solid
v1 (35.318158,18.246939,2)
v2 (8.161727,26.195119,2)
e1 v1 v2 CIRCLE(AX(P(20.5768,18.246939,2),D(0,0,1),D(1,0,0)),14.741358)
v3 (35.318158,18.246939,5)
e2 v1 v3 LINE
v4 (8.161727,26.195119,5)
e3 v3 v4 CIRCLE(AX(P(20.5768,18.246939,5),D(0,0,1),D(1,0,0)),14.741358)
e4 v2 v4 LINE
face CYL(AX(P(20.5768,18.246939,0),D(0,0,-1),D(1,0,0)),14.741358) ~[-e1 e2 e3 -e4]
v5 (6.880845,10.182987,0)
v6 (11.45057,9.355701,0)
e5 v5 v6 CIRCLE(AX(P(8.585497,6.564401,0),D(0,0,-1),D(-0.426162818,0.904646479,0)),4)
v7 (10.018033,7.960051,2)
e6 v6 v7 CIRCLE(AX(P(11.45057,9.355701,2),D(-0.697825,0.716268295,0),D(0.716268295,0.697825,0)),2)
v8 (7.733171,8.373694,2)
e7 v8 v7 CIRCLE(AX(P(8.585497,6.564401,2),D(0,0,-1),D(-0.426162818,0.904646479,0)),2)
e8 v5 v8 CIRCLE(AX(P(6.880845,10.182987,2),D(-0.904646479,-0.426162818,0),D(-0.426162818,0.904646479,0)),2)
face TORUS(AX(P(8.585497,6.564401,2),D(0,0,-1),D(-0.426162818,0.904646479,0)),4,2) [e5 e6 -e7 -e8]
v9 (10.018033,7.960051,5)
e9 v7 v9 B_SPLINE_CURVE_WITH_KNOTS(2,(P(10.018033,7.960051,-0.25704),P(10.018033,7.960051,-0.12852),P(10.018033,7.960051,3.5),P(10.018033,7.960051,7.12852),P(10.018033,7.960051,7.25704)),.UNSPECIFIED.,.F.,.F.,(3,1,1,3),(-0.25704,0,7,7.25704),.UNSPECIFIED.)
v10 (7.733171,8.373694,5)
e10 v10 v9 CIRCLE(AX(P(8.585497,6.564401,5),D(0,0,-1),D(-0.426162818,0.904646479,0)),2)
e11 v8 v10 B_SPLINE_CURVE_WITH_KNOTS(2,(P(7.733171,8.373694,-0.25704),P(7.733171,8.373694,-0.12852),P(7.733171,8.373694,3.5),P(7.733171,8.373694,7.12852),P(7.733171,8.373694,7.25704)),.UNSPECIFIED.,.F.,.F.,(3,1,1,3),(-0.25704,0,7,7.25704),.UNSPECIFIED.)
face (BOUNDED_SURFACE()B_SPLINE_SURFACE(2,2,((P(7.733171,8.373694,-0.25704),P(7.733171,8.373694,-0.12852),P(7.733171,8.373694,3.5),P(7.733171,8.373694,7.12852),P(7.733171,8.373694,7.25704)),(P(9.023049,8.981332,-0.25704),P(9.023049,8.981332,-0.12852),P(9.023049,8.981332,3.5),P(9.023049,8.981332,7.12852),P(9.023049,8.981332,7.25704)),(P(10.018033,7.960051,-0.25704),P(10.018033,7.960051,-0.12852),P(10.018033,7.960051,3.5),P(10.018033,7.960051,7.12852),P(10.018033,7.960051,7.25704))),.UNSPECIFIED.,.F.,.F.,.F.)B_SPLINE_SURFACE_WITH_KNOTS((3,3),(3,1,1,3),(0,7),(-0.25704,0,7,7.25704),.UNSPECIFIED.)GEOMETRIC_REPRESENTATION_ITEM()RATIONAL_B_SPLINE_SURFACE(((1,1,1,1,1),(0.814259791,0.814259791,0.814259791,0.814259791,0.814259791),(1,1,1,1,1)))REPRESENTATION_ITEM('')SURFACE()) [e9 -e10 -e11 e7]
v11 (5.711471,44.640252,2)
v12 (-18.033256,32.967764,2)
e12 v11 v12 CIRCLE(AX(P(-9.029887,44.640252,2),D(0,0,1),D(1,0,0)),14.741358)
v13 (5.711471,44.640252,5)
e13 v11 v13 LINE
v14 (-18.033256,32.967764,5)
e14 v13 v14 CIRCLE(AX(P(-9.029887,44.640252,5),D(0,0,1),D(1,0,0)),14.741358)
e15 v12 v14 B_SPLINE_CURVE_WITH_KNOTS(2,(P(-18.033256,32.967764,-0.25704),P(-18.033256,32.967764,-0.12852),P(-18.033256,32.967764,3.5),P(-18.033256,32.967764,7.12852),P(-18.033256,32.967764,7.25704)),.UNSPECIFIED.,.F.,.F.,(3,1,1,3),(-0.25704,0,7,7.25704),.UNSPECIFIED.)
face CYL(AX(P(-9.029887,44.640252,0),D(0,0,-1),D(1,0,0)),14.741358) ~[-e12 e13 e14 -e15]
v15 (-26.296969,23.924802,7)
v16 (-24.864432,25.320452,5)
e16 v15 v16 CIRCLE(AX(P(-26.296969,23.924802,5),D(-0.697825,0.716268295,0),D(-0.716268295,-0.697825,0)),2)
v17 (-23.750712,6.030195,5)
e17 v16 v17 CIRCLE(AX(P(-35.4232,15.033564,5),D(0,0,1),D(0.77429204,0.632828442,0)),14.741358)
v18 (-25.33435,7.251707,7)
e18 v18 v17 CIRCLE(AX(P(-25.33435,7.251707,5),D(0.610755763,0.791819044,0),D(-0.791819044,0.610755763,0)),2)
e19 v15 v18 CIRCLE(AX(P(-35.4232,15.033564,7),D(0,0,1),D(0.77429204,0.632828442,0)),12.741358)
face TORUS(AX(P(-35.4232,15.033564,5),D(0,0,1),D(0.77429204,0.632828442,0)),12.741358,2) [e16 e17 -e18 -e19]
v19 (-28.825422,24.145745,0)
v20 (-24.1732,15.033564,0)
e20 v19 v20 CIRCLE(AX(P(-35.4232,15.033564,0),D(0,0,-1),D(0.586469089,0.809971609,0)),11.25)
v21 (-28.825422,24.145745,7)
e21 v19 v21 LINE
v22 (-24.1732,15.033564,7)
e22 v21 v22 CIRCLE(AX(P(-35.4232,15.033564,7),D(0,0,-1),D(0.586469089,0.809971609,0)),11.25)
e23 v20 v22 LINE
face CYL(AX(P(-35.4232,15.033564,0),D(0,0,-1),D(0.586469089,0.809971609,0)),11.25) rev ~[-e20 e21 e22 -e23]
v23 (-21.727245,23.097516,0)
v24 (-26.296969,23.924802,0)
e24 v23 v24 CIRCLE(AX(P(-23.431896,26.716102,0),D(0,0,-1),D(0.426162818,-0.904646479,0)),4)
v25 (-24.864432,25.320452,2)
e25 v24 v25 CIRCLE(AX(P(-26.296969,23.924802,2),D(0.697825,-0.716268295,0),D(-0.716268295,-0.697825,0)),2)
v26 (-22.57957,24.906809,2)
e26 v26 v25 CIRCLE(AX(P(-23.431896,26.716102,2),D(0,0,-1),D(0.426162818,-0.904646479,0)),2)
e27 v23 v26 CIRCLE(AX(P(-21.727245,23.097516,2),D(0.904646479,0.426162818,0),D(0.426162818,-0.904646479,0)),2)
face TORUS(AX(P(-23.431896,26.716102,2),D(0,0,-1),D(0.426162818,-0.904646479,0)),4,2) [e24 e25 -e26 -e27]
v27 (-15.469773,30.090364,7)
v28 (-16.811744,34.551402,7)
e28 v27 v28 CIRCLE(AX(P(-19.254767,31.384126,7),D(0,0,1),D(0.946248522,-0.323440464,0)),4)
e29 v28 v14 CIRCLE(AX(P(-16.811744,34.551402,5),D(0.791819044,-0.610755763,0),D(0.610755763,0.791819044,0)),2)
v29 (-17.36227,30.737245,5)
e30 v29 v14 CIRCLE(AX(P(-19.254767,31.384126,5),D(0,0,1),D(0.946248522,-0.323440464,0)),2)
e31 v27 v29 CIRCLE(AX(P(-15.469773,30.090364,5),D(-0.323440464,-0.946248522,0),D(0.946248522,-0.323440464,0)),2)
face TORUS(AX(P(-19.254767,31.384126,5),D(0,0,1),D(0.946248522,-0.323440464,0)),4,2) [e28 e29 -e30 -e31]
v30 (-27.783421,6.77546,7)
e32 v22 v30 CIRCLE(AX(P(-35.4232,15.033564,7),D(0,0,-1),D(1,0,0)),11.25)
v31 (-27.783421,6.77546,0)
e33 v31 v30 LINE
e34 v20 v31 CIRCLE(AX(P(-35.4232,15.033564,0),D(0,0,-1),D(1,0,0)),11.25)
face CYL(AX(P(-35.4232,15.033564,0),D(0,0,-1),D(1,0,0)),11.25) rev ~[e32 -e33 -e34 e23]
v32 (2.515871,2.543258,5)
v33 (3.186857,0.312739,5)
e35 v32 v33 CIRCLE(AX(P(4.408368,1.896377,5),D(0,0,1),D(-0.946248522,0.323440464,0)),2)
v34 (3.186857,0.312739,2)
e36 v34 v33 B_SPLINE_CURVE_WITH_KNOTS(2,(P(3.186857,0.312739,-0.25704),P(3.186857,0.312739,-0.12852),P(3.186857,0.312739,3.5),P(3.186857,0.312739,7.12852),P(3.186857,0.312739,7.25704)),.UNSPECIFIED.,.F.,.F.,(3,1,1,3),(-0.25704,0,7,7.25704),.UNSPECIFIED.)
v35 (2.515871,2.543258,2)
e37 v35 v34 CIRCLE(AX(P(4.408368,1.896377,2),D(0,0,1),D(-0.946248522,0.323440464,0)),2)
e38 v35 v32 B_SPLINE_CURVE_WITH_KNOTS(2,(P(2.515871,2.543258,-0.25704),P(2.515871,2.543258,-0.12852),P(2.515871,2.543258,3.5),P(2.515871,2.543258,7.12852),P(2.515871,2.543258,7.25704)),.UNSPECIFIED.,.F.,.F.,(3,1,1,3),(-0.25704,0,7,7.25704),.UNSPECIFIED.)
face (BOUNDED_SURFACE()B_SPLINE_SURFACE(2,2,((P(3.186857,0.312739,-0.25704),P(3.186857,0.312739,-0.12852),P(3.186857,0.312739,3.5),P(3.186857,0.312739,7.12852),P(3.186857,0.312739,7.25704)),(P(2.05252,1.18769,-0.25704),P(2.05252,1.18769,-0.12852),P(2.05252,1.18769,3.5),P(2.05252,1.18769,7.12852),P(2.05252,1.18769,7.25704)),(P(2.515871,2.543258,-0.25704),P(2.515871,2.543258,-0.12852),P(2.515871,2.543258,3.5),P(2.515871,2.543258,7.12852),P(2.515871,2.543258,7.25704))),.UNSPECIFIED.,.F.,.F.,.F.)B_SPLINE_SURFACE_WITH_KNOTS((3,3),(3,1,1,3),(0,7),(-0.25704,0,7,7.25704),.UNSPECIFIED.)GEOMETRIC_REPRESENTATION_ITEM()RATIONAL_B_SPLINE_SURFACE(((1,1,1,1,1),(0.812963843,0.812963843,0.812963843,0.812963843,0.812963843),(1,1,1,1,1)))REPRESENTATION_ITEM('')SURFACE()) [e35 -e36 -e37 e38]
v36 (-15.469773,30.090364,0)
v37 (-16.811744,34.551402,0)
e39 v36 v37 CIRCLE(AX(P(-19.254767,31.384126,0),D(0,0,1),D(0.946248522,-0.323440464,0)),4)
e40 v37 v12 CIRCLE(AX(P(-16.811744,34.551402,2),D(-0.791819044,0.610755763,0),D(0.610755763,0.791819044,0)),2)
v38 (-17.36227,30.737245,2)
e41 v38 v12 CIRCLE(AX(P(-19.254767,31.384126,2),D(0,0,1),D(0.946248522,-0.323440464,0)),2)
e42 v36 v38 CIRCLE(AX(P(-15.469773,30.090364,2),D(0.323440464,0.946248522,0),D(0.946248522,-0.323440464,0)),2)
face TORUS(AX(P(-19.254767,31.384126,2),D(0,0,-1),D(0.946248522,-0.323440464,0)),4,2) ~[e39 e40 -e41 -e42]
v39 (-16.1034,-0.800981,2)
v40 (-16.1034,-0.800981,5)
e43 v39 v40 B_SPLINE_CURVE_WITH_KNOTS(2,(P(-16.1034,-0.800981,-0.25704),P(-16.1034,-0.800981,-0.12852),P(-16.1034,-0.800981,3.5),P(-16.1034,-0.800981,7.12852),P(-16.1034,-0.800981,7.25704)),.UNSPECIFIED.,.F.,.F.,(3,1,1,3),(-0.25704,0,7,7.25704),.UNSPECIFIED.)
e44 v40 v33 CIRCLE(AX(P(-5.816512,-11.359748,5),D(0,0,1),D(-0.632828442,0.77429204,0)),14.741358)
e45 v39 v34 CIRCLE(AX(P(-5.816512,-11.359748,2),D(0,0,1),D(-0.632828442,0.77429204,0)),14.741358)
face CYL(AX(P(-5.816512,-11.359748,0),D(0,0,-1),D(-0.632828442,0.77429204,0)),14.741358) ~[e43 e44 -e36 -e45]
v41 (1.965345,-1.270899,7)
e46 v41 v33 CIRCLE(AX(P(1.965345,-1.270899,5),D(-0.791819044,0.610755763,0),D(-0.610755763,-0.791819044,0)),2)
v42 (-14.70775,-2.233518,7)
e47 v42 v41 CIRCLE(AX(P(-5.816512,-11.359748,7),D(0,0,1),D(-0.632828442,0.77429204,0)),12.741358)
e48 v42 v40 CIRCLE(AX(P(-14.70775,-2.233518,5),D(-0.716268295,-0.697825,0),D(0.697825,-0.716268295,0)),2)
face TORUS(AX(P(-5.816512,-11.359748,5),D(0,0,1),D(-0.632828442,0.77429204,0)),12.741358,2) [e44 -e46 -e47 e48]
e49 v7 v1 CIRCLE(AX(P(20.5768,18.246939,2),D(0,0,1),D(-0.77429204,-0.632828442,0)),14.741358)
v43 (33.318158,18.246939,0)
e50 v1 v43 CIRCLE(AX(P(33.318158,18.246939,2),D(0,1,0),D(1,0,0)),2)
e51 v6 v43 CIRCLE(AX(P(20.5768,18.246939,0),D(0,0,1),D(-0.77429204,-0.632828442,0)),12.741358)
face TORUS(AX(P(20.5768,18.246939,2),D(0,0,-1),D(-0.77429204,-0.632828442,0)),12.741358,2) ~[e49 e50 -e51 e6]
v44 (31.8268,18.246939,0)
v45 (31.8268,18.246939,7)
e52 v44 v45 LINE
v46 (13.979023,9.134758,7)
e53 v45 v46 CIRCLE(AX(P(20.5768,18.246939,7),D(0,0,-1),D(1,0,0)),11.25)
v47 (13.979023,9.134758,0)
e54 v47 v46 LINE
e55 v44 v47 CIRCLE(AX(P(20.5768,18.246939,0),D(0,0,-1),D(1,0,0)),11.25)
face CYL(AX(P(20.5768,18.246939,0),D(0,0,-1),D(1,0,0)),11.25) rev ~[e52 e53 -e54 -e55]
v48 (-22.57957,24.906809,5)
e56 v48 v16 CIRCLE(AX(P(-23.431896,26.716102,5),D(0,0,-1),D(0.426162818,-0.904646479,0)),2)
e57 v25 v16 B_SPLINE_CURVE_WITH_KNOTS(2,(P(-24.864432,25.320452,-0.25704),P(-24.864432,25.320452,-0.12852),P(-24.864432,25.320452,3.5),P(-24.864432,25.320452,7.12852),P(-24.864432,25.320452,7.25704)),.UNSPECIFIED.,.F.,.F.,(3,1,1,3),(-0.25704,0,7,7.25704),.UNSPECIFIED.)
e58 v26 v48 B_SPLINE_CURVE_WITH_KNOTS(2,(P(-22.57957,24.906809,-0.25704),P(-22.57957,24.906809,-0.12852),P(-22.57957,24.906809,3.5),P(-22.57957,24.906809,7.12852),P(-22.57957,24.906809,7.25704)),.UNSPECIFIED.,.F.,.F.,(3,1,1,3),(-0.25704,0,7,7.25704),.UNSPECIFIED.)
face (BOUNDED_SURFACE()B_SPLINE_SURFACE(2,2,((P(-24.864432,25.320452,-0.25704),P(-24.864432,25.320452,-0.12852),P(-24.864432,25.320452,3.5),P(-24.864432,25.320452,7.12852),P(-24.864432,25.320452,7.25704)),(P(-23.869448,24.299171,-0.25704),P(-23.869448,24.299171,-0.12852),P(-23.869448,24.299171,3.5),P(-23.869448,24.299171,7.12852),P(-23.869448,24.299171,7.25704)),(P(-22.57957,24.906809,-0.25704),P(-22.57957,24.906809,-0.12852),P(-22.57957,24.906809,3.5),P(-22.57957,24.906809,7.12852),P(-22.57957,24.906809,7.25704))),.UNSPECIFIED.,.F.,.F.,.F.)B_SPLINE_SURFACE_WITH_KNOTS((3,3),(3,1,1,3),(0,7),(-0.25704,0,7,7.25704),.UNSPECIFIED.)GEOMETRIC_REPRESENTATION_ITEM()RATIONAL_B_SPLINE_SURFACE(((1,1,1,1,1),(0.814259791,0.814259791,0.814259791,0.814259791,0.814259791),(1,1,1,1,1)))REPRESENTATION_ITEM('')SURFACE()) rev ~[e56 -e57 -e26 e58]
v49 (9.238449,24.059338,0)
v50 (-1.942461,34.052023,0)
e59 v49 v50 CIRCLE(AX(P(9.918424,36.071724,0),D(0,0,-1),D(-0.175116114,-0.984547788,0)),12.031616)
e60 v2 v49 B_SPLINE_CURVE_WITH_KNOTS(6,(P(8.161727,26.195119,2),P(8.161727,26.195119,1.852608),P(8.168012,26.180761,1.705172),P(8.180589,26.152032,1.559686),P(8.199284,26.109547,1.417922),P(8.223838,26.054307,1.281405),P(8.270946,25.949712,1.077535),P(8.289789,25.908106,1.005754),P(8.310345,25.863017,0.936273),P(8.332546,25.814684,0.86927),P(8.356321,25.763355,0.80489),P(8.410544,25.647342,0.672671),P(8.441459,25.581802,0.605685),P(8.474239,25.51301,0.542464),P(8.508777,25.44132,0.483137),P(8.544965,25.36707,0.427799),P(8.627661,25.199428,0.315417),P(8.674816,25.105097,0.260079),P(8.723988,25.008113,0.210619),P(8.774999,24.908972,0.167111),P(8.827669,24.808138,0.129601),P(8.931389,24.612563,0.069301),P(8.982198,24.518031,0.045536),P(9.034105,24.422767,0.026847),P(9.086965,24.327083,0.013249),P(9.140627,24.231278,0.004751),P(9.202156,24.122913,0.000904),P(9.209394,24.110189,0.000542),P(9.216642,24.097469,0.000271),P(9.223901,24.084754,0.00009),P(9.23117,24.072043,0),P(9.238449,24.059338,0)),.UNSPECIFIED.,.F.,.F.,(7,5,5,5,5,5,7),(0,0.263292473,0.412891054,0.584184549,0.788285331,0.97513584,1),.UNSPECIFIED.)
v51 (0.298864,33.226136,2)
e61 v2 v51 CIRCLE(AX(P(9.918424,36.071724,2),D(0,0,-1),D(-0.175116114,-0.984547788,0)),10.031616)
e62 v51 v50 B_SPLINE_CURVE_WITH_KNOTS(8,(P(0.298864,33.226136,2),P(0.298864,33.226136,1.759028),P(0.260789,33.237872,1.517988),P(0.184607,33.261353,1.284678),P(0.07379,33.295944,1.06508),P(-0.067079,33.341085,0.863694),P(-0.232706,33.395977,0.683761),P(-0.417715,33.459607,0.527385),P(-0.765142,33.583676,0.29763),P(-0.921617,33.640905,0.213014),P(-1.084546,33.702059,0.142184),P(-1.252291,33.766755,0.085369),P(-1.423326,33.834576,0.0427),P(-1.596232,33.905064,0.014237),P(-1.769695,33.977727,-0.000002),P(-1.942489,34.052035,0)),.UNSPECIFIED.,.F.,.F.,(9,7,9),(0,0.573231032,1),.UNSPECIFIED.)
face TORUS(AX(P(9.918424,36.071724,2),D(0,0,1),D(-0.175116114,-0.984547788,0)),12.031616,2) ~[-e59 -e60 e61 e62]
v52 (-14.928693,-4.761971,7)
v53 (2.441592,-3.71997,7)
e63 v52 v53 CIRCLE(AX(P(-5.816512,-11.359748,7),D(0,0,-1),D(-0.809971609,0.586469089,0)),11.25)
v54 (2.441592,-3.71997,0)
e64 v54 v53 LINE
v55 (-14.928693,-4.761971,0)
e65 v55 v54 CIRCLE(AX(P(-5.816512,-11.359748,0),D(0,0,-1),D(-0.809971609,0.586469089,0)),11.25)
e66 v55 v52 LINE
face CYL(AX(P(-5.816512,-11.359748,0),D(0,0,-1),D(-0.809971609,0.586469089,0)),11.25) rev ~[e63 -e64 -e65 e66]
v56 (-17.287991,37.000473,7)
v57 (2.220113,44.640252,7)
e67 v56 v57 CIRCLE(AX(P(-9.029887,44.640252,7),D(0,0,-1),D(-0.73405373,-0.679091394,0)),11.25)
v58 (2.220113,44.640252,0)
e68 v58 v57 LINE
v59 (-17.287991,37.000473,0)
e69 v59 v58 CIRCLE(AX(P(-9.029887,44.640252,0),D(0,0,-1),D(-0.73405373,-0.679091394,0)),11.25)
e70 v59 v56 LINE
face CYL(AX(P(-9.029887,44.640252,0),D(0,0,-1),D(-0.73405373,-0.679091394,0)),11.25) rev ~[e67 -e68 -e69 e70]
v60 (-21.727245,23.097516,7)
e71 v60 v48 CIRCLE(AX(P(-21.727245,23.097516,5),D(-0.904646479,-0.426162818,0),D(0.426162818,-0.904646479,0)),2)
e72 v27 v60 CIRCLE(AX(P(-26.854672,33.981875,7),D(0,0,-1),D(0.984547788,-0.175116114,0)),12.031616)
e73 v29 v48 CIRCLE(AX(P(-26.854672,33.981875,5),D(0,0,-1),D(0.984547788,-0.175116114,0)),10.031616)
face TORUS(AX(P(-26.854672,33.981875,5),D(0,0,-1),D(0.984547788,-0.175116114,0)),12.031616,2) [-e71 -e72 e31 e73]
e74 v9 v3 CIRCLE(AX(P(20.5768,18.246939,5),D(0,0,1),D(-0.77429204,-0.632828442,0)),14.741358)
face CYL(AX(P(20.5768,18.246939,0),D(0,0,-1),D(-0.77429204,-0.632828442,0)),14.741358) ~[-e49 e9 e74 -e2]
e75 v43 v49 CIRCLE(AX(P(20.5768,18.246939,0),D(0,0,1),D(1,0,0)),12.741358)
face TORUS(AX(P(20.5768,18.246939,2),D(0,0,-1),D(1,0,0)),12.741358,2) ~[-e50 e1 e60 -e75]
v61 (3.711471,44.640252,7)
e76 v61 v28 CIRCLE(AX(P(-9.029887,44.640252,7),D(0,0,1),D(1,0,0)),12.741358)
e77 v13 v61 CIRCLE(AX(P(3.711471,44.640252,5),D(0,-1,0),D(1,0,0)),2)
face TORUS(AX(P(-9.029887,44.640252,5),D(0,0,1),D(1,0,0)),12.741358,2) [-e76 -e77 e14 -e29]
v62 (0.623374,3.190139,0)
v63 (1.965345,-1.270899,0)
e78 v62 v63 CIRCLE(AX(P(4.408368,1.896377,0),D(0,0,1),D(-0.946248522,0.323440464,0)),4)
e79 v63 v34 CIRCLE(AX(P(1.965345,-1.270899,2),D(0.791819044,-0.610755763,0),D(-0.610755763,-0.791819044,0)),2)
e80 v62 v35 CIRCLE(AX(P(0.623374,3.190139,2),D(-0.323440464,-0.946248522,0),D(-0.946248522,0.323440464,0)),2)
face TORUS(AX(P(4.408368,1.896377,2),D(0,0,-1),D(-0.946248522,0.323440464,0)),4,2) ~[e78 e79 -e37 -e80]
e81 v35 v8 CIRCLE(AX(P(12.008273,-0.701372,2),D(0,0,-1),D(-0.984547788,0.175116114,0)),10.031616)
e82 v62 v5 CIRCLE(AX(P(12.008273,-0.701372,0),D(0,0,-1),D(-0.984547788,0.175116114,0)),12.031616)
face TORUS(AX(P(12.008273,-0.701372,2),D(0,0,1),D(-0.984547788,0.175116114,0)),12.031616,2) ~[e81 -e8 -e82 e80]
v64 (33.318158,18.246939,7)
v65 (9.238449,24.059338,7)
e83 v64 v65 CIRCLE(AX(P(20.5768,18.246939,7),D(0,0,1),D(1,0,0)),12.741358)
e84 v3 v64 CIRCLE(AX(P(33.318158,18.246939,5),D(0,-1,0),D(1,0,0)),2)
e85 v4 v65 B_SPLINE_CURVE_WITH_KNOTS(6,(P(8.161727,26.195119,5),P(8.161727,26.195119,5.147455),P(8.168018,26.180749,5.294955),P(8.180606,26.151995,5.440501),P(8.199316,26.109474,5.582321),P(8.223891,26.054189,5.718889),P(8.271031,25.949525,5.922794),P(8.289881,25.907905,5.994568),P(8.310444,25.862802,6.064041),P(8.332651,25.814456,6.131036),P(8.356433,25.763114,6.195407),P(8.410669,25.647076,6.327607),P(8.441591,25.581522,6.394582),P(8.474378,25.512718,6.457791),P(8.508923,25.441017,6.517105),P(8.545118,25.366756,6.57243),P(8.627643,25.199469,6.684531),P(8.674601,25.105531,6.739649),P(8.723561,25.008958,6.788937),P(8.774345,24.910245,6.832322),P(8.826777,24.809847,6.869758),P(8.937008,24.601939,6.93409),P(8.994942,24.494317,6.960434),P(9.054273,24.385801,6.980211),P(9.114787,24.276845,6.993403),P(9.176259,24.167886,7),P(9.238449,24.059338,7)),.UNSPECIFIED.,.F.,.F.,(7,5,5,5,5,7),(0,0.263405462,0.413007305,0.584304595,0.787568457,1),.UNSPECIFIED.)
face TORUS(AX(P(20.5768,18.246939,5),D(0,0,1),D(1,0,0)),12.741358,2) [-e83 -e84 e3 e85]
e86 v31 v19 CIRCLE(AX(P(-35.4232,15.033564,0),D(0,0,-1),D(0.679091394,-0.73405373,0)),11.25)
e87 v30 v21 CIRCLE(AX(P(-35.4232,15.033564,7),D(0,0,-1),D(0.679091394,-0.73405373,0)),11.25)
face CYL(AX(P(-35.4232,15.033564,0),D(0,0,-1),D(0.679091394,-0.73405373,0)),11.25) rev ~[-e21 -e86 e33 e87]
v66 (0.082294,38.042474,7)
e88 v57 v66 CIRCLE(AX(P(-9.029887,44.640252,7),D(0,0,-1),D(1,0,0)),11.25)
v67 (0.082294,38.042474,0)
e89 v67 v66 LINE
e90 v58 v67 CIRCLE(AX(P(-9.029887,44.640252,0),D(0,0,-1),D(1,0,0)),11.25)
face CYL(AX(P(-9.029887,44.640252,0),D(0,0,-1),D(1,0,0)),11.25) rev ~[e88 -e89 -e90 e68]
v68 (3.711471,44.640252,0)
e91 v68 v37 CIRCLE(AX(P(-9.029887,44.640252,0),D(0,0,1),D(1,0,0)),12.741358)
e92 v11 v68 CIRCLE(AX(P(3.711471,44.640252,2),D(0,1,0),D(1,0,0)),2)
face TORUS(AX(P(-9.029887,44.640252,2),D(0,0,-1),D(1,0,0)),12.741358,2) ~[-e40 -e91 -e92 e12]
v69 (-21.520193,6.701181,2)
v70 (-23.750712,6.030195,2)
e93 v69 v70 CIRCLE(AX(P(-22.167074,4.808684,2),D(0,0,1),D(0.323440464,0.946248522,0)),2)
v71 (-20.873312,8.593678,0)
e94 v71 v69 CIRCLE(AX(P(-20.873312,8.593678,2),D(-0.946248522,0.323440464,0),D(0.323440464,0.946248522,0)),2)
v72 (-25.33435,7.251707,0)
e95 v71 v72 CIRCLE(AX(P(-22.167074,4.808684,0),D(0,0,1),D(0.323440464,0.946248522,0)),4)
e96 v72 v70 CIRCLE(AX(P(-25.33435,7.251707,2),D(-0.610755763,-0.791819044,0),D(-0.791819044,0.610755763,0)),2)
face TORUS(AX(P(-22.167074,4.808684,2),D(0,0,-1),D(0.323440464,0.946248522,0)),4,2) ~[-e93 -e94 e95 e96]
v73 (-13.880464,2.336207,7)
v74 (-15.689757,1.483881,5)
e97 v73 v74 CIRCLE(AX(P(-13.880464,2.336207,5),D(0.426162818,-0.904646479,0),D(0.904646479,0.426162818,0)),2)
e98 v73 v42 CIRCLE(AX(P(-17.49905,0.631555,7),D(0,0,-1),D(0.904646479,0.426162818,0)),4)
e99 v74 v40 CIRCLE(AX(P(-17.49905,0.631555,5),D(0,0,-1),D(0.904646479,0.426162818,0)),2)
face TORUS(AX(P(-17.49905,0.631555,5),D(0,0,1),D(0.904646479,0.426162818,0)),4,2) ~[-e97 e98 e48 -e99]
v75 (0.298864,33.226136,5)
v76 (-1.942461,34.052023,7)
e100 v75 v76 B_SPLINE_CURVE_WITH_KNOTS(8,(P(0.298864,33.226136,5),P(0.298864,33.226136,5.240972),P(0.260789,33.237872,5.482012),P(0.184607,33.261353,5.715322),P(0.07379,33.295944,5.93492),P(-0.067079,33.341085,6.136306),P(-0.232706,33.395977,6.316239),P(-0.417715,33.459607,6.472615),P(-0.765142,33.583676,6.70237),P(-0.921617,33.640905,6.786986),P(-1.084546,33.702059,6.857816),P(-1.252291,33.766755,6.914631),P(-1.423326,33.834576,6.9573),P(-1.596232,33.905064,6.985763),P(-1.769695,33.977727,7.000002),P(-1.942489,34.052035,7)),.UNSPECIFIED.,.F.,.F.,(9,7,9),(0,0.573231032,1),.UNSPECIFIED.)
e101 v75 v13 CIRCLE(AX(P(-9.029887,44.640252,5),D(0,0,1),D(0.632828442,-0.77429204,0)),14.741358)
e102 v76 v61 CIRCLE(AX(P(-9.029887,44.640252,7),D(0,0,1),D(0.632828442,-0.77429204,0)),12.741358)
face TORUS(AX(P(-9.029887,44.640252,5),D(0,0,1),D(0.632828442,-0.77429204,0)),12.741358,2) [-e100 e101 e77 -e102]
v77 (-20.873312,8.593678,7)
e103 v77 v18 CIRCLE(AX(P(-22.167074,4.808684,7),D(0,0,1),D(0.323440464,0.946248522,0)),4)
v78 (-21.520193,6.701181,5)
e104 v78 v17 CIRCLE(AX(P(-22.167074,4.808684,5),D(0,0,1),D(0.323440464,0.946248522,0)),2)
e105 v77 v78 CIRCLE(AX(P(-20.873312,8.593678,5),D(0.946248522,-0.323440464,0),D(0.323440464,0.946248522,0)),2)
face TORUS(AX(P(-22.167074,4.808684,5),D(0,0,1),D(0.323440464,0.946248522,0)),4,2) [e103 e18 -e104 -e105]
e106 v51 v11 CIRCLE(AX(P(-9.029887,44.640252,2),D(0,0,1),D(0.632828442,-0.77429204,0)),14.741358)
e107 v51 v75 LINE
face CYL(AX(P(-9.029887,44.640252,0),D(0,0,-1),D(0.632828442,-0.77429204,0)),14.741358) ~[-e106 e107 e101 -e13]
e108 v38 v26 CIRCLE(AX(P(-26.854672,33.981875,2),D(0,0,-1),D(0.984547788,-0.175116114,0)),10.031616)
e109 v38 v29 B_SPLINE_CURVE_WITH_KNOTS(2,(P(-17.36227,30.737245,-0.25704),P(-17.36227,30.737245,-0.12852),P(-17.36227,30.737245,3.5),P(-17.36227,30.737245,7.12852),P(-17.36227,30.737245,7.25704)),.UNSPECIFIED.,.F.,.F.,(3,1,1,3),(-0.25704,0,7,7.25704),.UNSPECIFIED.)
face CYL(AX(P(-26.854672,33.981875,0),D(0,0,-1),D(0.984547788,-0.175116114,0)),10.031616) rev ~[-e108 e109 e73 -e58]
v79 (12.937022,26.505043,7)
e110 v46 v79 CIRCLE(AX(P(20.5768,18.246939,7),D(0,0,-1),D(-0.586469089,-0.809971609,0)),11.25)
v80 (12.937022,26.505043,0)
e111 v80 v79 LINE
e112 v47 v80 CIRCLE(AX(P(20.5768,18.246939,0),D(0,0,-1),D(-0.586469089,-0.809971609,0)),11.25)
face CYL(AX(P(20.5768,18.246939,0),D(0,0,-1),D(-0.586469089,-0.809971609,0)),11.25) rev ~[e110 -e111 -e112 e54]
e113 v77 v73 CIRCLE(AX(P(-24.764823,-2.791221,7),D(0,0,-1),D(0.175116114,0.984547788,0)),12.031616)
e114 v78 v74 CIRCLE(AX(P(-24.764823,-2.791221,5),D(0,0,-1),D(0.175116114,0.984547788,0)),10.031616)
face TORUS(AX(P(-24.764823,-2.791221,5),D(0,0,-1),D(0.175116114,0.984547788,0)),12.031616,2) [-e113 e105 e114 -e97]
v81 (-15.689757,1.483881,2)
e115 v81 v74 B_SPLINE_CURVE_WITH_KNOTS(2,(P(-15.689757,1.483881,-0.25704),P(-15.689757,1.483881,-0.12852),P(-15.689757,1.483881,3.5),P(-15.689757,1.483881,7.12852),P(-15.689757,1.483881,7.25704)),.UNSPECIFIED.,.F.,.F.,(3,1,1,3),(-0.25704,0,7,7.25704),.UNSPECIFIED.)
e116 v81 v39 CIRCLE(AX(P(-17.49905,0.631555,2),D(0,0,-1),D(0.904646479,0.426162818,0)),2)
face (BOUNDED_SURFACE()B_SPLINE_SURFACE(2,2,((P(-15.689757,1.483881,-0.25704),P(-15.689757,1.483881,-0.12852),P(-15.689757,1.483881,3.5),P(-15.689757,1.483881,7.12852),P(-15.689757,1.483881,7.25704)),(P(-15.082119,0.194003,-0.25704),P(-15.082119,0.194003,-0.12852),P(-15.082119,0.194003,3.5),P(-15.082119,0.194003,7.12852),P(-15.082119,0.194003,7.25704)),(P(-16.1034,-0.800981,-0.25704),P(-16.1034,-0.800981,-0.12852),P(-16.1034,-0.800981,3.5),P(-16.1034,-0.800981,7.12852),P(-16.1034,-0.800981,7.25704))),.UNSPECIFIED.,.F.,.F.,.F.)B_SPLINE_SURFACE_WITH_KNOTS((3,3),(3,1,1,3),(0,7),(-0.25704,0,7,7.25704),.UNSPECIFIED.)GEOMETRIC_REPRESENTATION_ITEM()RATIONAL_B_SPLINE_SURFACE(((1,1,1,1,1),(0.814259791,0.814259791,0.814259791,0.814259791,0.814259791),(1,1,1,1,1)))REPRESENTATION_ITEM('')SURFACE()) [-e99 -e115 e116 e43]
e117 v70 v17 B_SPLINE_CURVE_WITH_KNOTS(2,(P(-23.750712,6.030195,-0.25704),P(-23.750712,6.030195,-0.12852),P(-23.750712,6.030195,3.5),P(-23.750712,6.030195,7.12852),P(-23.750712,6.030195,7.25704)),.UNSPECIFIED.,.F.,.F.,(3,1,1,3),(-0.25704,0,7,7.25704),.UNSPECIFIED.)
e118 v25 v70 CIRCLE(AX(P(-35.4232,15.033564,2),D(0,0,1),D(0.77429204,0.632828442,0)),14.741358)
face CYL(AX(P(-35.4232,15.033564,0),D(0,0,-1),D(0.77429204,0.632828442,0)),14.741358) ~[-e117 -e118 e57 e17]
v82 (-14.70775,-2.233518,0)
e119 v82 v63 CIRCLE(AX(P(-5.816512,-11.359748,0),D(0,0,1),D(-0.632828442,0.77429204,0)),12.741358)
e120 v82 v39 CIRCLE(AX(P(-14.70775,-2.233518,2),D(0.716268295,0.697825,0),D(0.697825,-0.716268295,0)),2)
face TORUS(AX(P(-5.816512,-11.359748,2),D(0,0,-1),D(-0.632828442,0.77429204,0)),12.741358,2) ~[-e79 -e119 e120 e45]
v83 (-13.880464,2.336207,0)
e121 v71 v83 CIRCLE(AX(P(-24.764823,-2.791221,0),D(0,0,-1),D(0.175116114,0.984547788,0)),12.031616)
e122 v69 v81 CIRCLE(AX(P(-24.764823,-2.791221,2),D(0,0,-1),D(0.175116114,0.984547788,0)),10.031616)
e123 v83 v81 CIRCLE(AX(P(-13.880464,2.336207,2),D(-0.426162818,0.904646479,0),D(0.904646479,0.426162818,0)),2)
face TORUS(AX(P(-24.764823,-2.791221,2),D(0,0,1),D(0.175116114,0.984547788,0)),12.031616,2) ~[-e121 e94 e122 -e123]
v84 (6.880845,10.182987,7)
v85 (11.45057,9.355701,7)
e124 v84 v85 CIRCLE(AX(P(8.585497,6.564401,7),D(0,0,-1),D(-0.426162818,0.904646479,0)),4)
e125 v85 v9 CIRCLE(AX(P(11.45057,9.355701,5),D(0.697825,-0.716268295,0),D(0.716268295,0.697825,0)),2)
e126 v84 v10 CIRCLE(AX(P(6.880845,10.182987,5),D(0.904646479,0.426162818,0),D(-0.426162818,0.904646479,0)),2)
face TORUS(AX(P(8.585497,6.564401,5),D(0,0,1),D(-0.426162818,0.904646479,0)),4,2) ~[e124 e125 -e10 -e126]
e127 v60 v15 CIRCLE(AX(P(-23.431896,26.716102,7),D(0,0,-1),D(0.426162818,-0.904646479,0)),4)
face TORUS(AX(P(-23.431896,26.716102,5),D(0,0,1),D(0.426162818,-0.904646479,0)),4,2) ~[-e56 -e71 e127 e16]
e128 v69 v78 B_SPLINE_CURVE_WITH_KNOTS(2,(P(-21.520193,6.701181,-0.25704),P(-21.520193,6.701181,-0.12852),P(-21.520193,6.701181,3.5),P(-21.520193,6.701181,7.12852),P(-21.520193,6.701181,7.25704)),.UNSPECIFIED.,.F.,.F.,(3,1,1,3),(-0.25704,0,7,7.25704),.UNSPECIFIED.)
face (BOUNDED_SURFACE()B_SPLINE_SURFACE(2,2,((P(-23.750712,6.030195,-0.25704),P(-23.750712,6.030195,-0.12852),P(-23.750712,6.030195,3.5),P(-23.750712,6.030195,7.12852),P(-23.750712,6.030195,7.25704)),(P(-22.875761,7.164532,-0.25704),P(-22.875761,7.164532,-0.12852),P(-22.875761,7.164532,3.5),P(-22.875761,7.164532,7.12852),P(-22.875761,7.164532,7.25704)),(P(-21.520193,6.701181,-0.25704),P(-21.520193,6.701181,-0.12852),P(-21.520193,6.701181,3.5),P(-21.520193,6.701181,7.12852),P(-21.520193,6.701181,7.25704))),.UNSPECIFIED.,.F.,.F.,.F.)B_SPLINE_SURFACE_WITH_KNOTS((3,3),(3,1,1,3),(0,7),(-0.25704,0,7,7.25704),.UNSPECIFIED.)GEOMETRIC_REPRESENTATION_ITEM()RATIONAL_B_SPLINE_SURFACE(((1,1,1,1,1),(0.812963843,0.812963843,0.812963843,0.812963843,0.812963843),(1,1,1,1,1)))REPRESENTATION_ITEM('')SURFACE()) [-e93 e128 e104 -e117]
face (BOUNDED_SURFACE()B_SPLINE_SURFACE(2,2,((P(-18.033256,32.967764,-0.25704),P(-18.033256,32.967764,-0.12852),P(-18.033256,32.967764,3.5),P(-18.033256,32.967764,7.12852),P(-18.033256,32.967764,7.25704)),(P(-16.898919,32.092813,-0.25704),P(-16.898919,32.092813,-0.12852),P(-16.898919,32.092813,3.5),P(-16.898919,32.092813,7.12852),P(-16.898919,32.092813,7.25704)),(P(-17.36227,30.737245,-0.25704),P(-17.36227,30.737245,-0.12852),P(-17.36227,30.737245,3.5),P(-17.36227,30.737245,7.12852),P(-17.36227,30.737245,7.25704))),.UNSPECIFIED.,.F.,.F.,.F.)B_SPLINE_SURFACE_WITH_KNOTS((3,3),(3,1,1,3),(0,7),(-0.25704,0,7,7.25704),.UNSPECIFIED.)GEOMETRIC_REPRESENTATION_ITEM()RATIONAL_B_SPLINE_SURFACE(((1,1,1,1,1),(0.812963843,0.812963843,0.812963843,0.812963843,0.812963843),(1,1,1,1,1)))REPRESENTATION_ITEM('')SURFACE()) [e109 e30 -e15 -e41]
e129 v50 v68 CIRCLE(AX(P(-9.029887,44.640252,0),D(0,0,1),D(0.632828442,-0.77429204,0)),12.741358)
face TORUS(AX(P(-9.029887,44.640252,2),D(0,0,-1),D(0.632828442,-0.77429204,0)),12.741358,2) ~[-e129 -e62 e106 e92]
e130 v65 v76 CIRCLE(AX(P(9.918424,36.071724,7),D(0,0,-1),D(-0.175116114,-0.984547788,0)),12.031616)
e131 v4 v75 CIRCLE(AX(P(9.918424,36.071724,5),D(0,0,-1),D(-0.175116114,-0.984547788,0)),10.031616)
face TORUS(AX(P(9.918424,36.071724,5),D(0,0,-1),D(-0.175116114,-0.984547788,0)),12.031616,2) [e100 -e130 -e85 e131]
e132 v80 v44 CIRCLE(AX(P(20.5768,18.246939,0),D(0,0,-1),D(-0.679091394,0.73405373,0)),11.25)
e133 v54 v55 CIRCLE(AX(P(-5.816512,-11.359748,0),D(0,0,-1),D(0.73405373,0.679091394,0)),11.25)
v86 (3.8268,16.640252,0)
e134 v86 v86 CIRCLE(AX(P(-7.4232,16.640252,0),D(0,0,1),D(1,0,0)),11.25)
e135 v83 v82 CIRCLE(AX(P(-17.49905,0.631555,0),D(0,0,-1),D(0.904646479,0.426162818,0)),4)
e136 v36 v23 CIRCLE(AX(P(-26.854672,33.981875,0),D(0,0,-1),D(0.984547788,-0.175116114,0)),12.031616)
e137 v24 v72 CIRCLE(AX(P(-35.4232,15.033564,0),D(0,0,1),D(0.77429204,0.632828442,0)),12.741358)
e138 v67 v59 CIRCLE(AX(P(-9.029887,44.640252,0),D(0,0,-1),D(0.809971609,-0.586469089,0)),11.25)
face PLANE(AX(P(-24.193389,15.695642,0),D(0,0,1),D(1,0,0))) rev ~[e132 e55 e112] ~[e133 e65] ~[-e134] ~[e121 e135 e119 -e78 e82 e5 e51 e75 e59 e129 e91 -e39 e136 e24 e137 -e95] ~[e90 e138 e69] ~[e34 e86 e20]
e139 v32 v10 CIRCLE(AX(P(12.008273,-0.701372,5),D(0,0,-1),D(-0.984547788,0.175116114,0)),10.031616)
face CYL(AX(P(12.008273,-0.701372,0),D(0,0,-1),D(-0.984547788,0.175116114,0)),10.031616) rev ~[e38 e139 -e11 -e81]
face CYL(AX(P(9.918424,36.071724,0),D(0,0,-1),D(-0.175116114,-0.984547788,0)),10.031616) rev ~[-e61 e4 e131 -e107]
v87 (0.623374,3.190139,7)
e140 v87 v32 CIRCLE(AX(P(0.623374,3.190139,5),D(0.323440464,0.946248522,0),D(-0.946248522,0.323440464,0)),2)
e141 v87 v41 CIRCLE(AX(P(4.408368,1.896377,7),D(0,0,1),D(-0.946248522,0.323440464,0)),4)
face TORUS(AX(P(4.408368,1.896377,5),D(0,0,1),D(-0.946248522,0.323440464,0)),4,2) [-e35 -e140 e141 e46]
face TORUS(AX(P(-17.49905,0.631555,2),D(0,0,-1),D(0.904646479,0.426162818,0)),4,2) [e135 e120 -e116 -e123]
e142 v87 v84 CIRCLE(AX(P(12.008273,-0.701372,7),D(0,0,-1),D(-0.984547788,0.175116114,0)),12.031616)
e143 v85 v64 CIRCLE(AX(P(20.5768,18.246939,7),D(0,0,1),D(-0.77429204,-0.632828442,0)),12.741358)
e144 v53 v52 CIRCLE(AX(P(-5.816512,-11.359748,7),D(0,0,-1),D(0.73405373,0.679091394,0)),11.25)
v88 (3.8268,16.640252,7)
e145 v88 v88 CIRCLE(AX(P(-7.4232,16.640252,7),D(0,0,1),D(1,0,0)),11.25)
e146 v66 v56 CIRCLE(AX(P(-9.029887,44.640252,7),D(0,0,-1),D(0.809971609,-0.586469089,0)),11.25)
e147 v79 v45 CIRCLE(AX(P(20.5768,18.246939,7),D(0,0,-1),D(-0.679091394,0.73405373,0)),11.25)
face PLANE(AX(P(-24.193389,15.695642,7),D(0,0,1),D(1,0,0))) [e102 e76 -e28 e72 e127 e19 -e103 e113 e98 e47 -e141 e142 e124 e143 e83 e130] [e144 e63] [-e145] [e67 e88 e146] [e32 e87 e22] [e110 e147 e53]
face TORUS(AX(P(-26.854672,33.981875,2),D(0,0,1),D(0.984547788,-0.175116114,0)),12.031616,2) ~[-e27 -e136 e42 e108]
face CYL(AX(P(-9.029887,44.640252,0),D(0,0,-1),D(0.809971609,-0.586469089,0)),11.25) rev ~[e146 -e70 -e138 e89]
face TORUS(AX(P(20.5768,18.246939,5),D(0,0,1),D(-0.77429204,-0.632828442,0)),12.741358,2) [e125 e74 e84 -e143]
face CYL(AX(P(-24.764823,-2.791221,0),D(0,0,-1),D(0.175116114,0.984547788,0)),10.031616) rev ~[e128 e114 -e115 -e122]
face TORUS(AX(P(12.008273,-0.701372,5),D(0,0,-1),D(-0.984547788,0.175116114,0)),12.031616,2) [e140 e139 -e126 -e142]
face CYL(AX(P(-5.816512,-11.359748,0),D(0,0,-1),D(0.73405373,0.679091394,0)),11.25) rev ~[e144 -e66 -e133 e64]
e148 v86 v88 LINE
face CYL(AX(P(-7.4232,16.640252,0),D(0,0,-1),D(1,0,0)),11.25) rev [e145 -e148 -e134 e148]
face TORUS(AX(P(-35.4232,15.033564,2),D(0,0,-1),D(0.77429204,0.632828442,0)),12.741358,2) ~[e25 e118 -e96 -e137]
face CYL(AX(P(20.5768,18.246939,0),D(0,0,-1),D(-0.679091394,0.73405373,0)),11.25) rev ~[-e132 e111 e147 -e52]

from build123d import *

# Parameters (mm, degrees)
F0_R     = 11.25
F1_DEPTH = 7
F2_R     = 2


with BuildPart() as f1:
    # F0 (on Top) → F1 (new body)
    with BuildSketch(Plane.XY):
        with BuildLine():
            ThreePointArc((-20.6818419333, 15.0335644628), (-21.5385463681, 19.9857387785), (-24.0090837029, 24.3623148626))
            ThreePointArc((-24.0090837029, 24.3623148626), (-26.4040491127, 23.960385675), (-28.8254223349, 24.1457450693))
            ThreePointArc((-28.8254223349, 24.1457450693), (-25.4035315724, 20.1491048046), (-24.1731995815, 15.0335644628))
            ThreePointArc((-24.1731995815, 15.0335644628), (-25.1151928743, 10.5271803553), (-27.7834213991, 6.7754599996))
            ThreePointArc((-27.7834213991, 6.7754599996), (-25.4145244015, 7.2193338549), (-23.0081257396, 7.0853843686))
            ThreePointArc((-23.0081257396, 7.0853843686), (-21.2753610709, 10.8927564753), (-20.6818419333, 15.0335644628))
        make_face()
        with BuildLine():
            ThreePointArc((-28.8254223349, 24.1457450693), (-26.4040491127, 23.960385675), (-24.0090837029, 24.3623148626))
            ThreePointArc((-24.0090837029, 24.3623148626), (-50.1398789796, 14.1809374616), (-23.0081257396, 7.0853843686))
            ThreePointArc((-23.0081257396, 7.0853843686), (-25.4145244015, 7.2193338549), (-27.7834213991, 6.7754599996))
            ThreePointArc((-27.7834213991, 6.7754599996), (-46.6530124471, 14.3599154428), (-28.8254223349, 24.1457450693))
        make_face()
        with BuildLine():
            ThreePointArc((0.2988637144, 33.2261356881), (-8.1772596841, 29.9235721685), (-16.9780667795, 32.2251777247))
            ThreePointArc((-16.9780667795, 32.2251777247), (-19.3767240664, 27.2950515881), (-24.0090837029, 24.3623148626))
            ThreePointArc((-24.0090837029, 24.3623148626), (-21.5385463681, 19.9857387785), (-20.6818419333, 15.0335644628))
            ThreePointArc((-20.6818419333, 15.0335644628), (-21.2753610709, 10.8927564753), (-23.0081257396, 7.0853843686))
            ThreePointArc((-23.0081257396, 7.0853843686), (-18.0779996029, 4.6867270817), (-15.1452628774, 0.0543674452))
            ThreePointArc((-15.1452628774, 0.0543674452), (-6.6691394789, 3.3569309648), (2.1316676166, 1.0553254086))
            ThreePointArc((2.1316676166, 1.0553254086), (4.5303249035, 5.9854515452), (9.16268454, 8.9181882707))
            ThreePointArc((9.16268454, 8.9181882707), (5.8601210204, 17.3943116693), (8.1617265766, 26.1951187647))
            ThreePointArc((8.1617265766, 26.1951187647), (3.23160044, 28.5937760516), (0.2988637144, 33.2261356881))
        make_face()
        with Locations((-7.4231995815, 16.6402515666)):
            Circle(F0_R, mode=Mode.SUBTRACT)
        with BuildLine():
            ThreePointArc((0.0822939211, 38.0424743201), (-8.3562376653, 33.410438701), (-17.2879911485, 37.0004733843))
            ThreePointArc((-17.2879911485, 37.0004733843), (-16.8441172933, 34.6315763866), (-16.9780667795, 32.2251777247))
            ThreePointArc((-16.9780667795, 32.2251777247), (-8.1772596841, 29.9235721685), (0.2988637144, 33.2261356881))
            ThreePointArc((0.2988637144, 33.2261356881), (-0.1030654731, 35.6211010979), (0.0822939211, 38.0424743201))
        make_face()
        with BuildLine():
            ThreePointArc((-17.2879911485, 37.0004733843), (-13.1322533674, 55.1156077709), (2.2201133147, 44.6402515666))
            ThreePointArc((2.2201133147, 44.6402515666), (1.6723217742, 41.1725096373), (0.0822939211, 38.0424743201))
            ThreePointArc((0.0822939211, 38.0424743201), (-0.1030654731, 35.6211010979), (0.2988637144, 33.2261356881))
            ThreePointArc((0.2988637144, 33.2261356881), (4.2897617966, 38.3240351653), (5.7114709628, 44.6402515666))
            ThreePointArc((5.7114709628, 44.6402515666), (-16.1059258277, 57.5722775241), (-16.9780667795, 32.2251777247))
            ThreePointArc((-16.9780667795, 32.2251777247), (-16.8441172933, 34.6315763866), (-17.2879911485, 37.0004733843))
        make_face()
        with BuildLine():
            ThreePointArc((35.3181580667, 18.2469386705), (24.717608406, 32.394777181), (8.1617265766, 26.1951187647))
            ThreePointArc((8.1617265766, 26.1951187647), (10.5681252385, 26.0611692784), (12.9370222362, 26.5050431337))
            ThreePointArc((12.9370222362, 26.5050431337), (25.083184526, 28.5549453777), (31.8268004185, 18.2469386705))
            ThreePointArc((31.8268004185, 18.2469386705), (25.6923407603, 8.2272706614), (13.979023172, 9.134758064))
            ThreePointArc((13.979023172, 9.134758064), (11.5576499498, 9.3201174583), (9.16268454, 8.9181882707))
            ThreePointArc((9.16268454, 8.9181882707), (25.5289747343, 4.3622854571), (35.3181580667, 18.2469386705))
        make_face()
        with BuildLine():
            ThreePointArc((12.9370222362, 26.5050431337), (10.5681252385, 26.0611692784), (8.1617265766, 26.1951187647))
            ThreePointArc((8.1617265766, 26.1951187647), (5.8601210204, 17.3943116693), (9.16268454, 8.9181882707))
            ThreePointArc((9.16268454, 8.9181882707), (11.5576499498, 9.3201174583), (13.979023172, 9.134758064))
            ThreePointArc((13.979023172, 9.134758064), (9.3469875529, 17.5732896505), (12.9370222362, 26.5050431337))
        make_face()
        with BuildLine():
            ThreePointArc((2.1316676166, 1.0553254086), (-6.6691394789, 3.3569309648), (-15.1452628774, 0.0543674452))
            ThreePointArc((-15.1452628774, 0.0543674452), (-14.7433336899, -2.3405979646), (-14.9286930841, -4.7619711868))
            ThreePointArc((-14.9286930841, -4.7619711868), (-6.4901614976, -0.1299355677), (2.4415919855, -3.719970251))
            ThreePointArc((2.4415919855, -3.719970251), (1.9977181303, -1.3510732534), (2.1316676166, 1.0553254086))
        make_face()
        with BuildLine():
            ThreePointArc((-14.9286930841, -4.7619711868), (-14.7433336899, -2.3405979646), (-15.1452628774, 0.0543674452))
            ThreePointArc((-15.1452628774, 0.0543674452), (-12.132728879, -24.6793969153), (8.9248451705, -11.3597484334))
            ThreePointArc((8.9248451705, -11.3597484334), (7.1155134799, -4.283709291), (2.1316676166, 1.0553254086))
            ThreePointArc((2.1316676166, 1.0553254086), (1.9977181303, -1.3510732534), (2.4415919855, -3.719970251))
            ThreePointArc((2.4415919855, -3.719970251), (4.6588437266, -7.2573817512), (5.4334875224, -11.3597484334))
            ThreePointArc((5.4334875224, -11.3597484334), (-9.284254407, -22.0619568929), (-14.9286930841, -4.7619711868))
        make_face()
    extrude(amount=F1_DEPTH)

    # F2
    f2_edges = [f1.edges().sort_by_distance(p)[0] for p in [
        (-9.882514, 59.356931, 7),
        (-16.978067, 32.225178, 3.5),
        (-24.009084, 24.362315, 3.5),
        (-19.376724, 27.295052, 0),
        (-19.376724, 27.295052, 7),
        (-23.008126, 7.085384, 3.5),
        (-15.145263, 0.054367, 3.5),
        (-18.078, 4.686727, 0),
        (-18.078, 4.686727, 7),
        (2.131668, 1.055325, 3.5),
        (9.162685, 8.918188, 3.5),
        (4.530325, 5.985452, 0),
        (4.530325, 5.985452, 7),
        (3.2316, 28.593776, 7),
        (3.2316, 28.593776, 0),
        (-50.139879, 14.180937, 0),
        (-50.139879, 14.180937, 7),
        (-4.963885, -26.076428, 0),
        (-4.963885, -26.076428, 7),
        (35.29348, 19.099566, 0),
        (35.29348, 19.099566, 7),
        (-9.882514, 59.356931, 0),
    ]]
    fillet(f2_edges, radius=F2_R)


solid = f1.part
